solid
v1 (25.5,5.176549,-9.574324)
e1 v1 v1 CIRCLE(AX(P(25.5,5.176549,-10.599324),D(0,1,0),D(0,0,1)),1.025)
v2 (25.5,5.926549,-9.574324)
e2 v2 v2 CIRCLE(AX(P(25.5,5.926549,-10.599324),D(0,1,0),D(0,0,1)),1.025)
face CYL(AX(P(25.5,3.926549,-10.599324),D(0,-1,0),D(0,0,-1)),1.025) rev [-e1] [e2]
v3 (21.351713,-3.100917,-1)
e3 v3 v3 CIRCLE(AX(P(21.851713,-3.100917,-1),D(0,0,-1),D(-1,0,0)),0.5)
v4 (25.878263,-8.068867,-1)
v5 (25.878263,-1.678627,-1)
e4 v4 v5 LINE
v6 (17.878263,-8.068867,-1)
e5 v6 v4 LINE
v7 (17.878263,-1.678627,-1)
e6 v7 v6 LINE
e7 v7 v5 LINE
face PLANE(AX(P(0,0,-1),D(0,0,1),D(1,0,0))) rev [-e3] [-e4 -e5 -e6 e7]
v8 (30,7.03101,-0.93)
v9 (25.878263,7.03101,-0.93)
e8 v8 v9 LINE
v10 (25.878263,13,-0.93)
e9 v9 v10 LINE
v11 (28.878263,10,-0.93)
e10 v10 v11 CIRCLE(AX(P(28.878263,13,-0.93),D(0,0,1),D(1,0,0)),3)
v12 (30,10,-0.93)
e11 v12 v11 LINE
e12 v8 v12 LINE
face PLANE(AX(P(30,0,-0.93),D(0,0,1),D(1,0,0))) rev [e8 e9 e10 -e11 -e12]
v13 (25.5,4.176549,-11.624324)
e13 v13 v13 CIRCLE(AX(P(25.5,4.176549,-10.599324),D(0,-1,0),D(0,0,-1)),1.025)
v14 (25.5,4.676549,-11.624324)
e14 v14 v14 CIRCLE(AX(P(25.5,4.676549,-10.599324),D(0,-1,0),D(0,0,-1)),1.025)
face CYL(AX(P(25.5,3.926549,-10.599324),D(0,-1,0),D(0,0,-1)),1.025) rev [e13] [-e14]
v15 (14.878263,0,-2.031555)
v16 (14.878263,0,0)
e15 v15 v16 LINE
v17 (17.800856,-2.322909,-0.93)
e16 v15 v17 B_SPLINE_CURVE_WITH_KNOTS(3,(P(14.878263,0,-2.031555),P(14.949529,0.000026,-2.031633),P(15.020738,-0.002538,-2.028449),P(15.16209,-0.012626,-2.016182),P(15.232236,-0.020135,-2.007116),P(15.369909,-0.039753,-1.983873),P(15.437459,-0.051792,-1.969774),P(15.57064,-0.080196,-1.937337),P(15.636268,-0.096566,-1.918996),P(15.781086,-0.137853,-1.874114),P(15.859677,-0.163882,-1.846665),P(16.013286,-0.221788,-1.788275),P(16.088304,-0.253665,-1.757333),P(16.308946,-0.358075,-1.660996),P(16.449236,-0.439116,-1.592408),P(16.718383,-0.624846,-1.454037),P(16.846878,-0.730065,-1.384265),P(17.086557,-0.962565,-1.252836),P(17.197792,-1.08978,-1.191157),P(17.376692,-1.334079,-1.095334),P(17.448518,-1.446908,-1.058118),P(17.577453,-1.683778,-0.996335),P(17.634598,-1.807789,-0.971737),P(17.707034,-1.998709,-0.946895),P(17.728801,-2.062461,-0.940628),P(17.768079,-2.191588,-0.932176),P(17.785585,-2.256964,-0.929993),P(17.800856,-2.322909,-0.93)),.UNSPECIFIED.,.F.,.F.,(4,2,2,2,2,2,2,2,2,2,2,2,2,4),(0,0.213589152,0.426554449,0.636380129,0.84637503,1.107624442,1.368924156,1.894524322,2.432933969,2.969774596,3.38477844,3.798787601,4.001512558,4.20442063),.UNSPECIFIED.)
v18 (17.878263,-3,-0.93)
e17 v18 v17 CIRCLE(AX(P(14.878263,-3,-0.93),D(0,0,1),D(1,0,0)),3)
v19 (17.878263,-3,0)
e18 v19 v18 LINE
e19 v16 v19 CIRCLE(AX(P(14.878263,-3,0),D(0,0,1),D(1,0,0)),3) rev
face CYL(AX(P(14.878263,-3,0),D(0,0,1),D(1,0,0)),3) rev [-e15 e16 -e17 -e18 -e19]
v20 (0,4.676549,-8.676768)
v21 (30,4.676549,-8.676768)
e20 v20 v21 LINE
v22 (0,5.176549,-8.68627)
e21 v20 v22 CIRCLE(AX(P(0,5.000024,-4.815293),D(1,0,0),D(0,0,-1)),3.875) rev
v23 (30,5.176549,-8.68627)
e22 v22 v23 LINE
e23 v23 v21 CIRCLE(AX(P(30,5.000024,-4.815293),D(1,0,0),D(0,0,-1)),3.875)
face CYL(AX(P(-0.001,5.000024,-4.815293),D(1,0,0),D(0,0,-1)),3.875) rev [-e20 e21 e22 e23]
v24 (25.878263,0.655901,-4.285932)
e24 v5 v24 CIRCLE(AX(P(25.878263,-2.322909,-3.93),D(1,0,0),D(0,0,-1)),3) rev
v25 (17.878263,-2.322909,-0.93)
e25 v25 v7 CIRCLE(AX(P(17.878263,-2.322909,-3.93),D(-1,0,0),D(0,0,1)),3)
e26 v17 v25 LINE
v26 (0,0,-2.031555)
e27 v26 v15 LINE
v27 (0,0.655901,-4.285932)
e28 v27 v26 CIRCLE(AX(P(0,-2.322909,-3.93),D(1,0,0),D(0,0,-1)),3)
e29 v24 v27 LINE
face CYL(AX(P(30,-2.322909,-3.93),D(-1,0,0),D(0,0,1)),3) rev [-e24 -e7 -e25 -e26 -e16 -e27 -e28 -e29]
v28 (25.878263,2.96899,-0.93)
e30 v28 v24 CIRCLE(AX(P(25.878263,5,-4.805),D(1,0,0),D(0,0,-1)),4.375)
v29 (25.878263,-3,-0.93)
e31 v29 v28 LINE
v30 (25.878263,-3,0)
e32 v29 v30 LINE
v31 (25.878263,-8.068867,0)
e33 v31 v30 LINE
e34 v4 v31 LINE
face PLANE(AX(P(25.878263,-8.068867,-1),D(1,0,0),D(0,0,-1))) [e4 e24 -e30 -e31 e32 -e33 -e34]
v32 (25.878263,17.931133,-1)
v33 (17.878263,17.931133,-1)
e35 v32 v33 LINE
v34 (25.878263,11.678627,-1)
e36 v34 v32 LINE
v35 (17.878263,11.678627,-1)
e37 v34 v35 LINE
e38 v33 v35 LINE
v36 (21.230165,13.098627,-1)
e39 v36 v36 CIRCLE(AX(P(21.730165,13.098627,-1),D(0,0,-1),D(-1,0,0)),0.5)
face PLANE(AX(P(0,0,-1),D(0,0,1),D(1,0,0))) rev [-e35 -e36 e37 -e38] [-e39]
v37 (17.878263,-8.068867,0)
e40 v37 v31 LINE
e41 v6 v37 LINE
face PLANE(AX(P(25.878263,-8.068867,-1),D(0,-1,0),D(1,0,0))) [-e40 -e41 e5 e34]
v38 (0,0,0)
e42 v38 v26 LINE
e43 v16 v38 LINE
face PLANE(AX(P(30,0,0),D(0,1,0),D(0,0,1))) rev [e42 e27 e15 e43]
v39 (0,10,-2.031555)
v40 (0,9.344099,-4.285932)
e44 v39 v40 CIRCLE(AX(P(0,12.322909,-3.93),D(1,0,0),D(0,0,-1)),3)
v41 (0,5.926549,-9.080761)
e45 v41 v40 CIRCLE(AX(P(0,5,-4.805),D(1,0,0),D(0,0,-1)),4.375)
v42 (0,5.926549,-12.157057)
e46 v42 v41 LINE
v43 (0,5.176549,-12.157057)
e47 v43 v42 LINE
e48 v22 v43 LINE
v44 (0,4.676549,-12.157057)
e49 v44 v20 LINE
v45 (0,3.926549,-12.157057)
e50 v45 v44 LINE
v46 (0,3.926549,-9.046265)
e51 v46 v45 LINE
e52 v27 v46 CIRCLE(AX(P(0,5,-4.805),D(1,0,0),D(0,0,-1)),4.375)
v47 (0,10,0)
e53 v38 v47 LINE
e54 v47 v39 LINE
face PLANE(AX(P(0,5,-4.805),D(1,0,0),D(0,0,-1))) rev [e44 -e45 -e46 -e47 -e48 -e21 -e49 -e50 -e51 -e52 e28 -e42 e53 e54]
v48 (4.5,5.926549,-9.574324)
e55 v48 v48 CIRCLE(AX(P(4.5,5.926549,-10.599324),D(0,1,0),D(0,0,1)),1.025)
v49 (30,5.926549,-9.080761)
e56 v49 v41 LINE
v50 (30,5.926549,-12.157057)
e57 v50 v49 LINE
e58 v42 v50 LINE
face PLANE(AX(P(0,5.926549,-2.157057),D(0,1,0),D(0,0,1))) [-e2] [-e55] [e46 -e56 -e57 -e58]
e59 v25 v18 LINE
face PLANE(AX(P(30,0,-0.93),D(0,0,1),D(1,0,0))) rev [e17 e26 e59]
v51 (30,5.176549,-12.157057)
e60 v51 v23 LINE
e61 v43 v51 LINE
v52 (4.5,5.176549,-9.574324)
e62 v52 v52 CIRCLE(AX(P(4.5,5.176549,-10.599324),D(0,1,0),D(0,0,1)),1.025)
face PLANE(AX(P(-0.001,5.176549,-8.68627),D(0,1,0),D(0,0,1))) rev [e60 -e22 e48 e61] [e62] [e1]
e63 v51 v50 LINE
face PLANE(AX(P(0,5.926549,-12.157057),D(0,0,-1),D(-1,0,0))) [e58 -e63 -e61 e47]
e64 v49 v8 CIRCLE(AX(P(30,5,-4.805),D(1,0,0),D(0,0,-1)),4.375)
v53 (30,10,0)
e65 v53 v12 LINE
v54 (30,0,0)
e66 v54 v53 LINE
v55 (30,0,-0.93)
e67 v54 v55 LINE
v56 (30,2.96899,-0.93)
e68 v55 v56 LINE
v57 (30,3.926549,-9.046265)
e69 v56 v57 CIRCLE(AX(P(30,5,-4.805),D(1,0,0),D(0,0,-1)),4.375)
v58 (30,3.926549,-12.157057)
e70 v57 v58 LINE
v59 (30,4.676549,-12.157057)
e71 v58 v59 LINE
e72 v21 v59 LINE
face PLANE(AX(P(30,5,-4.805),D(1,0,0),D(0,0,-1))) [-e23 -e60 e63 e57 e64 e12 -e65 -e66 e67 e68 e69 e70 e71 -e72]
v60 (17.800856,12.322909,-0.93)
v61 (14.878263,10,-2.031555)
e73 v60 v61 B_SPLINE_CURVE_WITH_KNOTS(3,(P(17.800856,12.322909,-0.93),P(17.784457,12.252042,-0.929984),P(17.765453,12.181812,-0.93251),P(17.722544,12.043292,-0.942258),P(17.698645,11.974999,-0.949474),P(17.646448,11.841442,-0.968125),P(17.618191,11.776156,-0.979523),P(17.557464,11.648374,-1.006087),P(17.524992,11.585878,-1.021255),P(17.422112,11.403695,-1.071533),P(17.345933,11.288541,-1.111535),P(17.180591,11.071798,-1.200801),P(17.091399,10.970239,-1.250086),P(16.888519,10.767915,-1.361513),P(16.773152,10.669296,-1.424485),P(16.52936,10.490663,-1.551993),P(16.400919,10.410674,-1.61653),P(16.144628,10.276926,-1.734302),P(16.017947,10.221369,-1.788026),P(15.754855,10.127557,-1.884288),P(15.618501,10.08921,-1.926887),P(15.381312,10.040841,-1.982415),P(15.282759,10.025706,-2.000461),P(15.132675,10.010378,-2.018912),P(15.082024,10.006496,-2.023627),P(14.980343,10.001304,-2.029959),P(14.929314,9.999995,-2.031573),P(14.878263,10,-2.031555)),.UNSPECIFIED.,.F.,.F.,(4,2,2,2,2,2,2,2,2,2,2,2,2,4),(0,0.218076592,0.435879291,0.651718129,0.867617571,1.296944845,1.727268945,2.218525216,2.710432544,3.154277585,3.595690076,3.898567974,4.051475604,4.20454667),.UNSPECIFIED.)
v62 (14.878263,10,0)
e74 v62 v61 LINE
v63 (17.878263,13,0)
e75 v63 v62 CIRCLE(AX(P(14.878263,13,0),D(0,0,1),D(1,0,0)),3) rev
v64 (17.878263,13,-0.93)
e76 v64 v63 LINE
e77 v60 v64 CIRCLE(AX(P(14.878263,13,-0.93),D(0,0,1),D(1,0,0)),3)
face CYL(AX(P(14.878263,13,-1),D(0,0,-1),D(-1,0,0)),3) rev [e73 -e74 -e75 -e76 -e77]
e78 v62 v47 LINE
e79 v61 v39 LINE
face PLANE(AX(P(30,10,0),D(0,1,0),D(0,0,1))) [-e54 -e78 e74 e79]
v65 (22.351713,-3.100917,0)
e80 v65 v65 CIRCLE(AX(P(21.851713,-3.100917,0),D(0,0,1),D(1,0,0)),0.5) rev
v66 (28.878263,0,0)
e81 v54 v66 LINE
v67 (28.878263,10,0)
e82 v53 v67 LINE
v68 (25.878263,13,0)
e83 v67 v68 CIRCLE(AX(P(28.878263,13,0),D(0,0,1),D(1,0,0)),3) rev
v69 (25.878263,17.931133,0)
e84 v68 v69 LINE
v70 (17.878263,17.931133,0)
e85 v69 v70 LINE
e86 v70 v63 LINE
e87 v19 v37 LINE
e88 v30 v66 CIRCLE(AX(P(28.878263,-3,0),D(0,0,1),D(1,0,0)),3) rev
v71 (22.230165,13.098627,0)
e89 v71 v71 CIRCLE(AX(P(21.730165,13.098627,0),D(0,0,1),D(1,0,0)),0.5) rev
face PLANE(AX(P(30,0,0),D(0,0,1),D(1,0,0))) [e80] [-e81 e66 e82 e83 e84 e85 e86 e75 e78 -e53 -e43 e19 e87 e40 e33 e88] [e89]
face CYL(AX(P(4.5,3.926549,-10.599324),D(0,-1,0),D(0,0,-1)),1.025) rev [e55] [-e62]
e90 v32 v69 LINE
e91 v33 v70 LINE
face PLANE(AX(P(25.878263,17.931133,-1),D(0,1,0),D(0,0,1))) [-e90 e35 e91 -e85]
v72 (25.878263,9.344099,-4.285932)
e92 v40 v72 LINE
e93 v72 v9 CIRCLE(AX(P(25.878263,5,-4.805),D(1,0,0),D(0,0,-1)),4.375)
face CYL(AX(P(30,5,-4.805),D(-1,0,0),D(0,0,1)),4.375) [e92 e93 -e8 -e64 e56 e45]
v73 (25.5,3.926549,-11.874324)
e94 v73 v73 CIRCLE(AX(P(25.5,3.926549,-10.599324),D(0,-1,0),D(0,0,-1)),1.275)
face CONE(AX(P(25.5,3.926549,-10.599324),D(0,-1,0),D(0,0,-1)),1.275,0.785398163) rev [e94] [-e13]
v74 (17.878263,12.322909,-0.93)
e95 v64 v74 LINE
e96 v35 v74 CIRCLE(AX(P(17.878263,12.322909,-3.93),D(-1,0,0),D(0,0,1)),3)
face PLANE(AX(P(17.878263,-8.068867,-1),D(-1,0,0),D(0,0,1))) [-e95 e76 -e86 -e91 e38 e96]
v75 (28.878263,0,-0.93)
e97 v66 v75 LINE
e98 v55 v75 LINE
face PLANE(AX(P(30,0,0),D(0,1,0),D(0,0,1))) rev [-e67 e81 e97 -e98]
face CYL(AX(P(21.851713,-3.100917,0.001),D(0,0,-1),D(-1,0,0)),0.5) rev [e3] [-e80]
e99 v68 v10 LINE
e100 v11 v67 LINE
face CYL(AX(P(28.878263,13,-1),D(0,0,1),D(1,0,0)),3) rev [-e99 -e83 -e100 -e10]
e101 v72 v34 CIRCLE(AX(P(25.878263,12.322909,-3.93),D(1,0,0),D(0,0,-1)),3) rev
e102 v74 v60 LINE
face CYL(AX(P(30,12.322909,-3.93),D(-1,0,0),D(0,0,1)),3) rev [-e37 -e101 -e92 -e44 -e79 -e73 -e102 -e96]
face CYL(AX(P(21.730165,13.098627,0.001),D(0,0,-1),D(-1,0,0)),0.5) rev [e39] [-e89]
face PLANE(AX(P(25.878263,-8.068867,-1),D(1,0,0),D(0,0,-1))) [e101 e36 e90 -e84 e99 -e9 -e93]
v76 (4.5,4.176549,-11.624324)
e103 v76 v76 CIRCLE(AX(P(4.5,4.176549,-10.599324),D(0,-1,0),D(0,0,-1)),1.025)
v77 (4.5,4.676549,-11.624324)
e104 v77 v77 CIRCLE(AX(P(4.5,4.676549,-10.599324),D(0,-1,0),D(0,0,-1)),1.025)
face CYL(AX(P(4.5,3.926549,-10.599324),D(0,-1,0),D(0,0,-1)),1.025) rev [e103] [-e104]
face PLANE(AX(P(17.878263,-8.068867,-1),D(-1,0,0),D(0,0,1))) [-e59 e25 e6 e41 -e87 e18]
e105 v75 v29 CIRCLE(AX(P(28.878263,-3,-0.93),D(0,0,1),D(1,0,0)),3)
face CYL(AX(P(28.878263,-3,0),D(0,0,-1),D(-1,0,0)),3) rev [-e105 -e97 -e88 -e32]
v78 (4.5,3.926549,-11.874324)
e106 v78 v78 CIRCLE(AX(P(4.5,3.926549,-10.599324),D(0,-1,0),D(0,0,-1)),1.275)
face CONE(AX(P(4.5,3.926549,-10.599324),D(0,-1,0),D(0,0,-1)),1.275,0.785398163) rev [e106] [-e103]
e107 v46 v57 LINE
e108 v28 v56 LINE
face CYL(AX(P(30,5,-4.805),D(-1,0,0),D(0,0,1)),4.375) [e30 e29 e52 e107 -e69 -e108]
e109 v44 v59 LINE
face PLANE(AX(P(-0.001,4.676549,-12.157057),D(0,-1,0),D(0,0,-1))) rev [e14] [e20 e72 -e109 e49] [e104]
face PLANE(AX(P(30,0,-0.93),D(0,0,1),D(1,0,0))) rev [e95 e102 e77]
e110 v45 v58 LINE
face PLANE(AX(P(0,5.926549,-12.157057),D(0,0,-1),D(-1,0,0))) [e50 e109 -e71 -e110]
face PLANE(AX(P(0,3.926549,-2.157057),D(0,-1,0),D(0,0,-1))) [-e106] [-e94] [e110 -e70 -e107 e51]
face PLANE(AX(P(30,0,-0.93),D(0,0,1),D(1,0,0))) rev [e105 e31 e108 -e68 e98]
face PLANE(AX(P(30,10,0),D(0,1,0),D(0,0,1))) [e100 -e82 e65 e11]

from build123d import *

# Parameters (mm, degrees)
SKETCH1_R                          = 4.375
SKETCH1_W                          = 0.93
SKETCH1_H                          = 10
BOSS_EXTRUDE1_DEPTH                = 30
SKETCH2_W                          = 8
SKETCH2_H                          = 26
BOSS_EXTRUDE3_DEPTH                = 1
FILLET4_R                          = 3
FILLET5_DEPTH                      = 25.878263471
FILLET5_START                      = 14.878263371
FILLET5_2_DEPTH                    = 11.0000001
FILLET5_START_2                    = -3
FILLET5_3_DEPTH                    = 2.07
CUT_EXTRUDE1_REACH                 = 37.895
SKETCH3_R                          = 0.5
SKETCH4_W                          = 10
SKETCH4_H                          = 2
BOSS_EXTRUDE4_DEPTH                = 30
CUT_EXTRUDE2_REACH                 = 39.004
SKETCH5_R                          = 3.875
CUT_EXTRUDE4_REACH                 = 39.004
M2_5X0_45_TAPPED_HOLE1_D           = 2.05
M2_5X0_45_TAPPED_HOLE1_CSINK_D     = 2.55
M2_5X0_45_TAPPED_HOLE1_CSINK_ANGLE = 90


with BuildPart() as part:
    # Sketch1 → Boss-Extrude1 (new body)
    with BuildSketch(Plane(origin=(0, 0, 0), x_dir=(0, 0, -1), z_dir=(1, 0, 0))):
        with Locations((4.805, 5)):
            Circle(SKETCH1_R)
        with Locations((0.465, 5)):
            Rectangle(SKETCH1_W, SKETCH1_H)
    extrude(amount=BOSS_EXTRUDE1_DEPTH)

    # Sketch2 → Boss-Extrude3 (add)
    with BuildSketch(Plane.XY):
        with Locations((21.878263471, 4.931133475)):
            Rectangle(SKETCH2_W, SKETCH2_H)
    extrude(amount=-BOSS_EXTRUDE3_DEPTH)

    # Fillet4
    fillet4_edges = [part.edges().sort_by_distance(p)[0] for p in [
        (17.878263471, 10, -0.465),
        (25.878263471, 10, -0.465),
        (17.878263471, 0, -0.465),
        (25.878263471, 0, -0.465),
    ]]
    fillet(fillet4_edges, radius=FILLET4_R)

    # Fillet5: read off the stored shape, not the designer's step
    # Fillet5 outline → Fillet5 (add)
    with BuildSketch(Plane.YZ):
        with BuildLine():
            ThreePointArc((9.344098712, -4.285932203), (9.442351653, -3.091914153), (10, -2.031555221))
            Line((10, -2.031555221), (10, -0.93))
            Line((10, -0.93), (7.031009601, -0.93))
            ThreePointArc((7.031009601, -0.93), (8.602231494, -2.32214816), (9.344098712, -4.285932203))
        make_face()
        with BuildLine():
            ThreePointArc((0, -2.031555221), (0.557648347, -3.091914153), (0.655901288, -4.285932203))
            ThreePointArc((0.655901288, -4.285932203), (1.397768506, -2.32214816), (2.968990399, -0.93))
            Line((2.968990399, -0.93), (0, -0.93))
            Line((0, -0.93), (0, -2.031555221))
        make_face()
    extrude(amount=FILLET5_DEPTH)

    # Fillet5 2 outline → Fillet5 2 (add)
    with BuildSketch(Plane.YZ.offset(FILLET5_START)):
        with BuildLine():
            ThreePointArc((10, -2.031555221), (11.037478267, -1.219341931), (12.322909258, -0.93))
            Line((12.322909258, -0.93), (10, -0.93))
            Line((10, -0.93), (10, -2.031555221))
        make_face()
        with BuildLine():
            Line((0, -2.031555221), (0, -0.93))
            Line((0, -0.93), (-2.322909258, -0.93))
            ThreePointArc((-2.322909258, -0.93), (-1.037478267, -1.219341931), (0, -2.031555221))
        make_face()
    extrude(amount=FILLET5_2_DEPTH)

    # Fillet5 3 outline → Fillet5 3 (cut)
    with BuildSketch(Plane.XY.offset(FILLET5_START_2)):
        with BuildLine():
            ThreePointArc((14.878263471, 10), (16.999583814, 10.878679656), (17.878263471, 13))
            Line((17.878263471, 13), (17.878263471, 14))
            Line((17.878263471, 14), (14.878263371, 14))
            Line((14.878263371, 14), (14.878263471, 10))
        make_face()
        with BuildLine():
            Line((14.878263371, -4), (17.878263471, -4))
            Line((17.878263471, -4), (17.878263471, -3))
            ThreePointArc((17.878263471, -3), (16.999583814, -0.878679657), (14.878263471, 0))
            Line((14.878263471, 0), (14.878263371, -4))
        make_face()
    extrude(amount=FILLET5_3_DEPTH, mode=Mode.SUBTRACT)

    # Sketch3 → Cut-Extrude1 (cut, up to next)
    with BuildSketch(Plane(origin=(0, 0, -1), x_dir=(-1, 0, 0), z_dir=(0, 0, -1)), mode=Mode.PRIVATE) as cut_extrude1_sk1:
        with Locations((-21.730165356, 13.098626711)):
            Circle(SKETCH3_R)
    cut_extrude1_tool1 = extrude(cut_extrude1_sk1.sketch, amount=-CUT_EXTRUDE1_REACH, mode=Mode.PRIVATE) & part.part
    # Sketch3 → Cut-Extrude1 (cut, up to next)
    with BuildSketch(Plane(origin=(0, 0, -1), x_dir=(-1, 0, 0), z_dir=(0, 0, -1)), mode=Mode.PRIVATE) as cut_extrude1_sk2:
        with Locations((-21.851713242, -3.100917298)):
            Circle(SKETCH3_R)
    cut_extrude1_tool2 = extrude(cut_extrude1_sk2.sketch, amount=-CUT_EXTRUDE1_REACH, mode=Mode.PRIVATE) & part.part
    add(cut_extrude1_tool1.solids().sort_by_distance((21.730165, 13.098627, -1))[0], mode=Mode.SUBTRACT)
    add(cut_extrude1_tool2.solids().sort_by_distance((21.851713, -3.100917, -1))[0], mode=Mode.SUBTRACT)

    # Sketch4 → Boss-Extrude4 (add)
    with BuildSketch(Plane(origin=(30, 0, 0), x_dir=(0, 0, -1), z_dir=(1, 0, 0))):
        with Locations((7.157056942, 4.926549366)):
            Rectangle(SKETCH4_W, SKETCH4_H)
    extrude(amount=-BOSS_EXTRUDE4_DEPTH)

    # Sketch5 → Cut-Extrude2 (cut, up to next)
    with BuildSketch(Plane(origin=(30, 0, 0), x_dir=(0, 0, -1), z_dir=(1, 0, 0)), mode=Mode.PRIVATE) as cut_extrude2_sk1:
        with Locations((4.815292967, 5.000024119)):
            Circle(SKETCH5_R)
    cut_extrude2_tool1 = extrude(cut_extrude2_sk1.sketch, amount=-CUT_EXTRUDE2_REACH, mode=Mode.PRIVATE) & part.part
    add(cut_extrude2_tool1.solids().sort_by_distance((30, 5.000024, -4.815293))[0], mode=Mode.SUBTRACT)

    # Sketch6 → Cut-Extrude4 (cut, up to next)
    with BuildSketch(Plane(origin=(30, 0, 0), x_dir=(0, 0, -1), z_dir=(1, 0, 0)), mode=Mode.PRIVATE) as cut_extrude4_sk1:
        with BuildLine():
            Line((12.157056942, 5.176549366), (12.157056942, 4.676549366))
            Line((12.157056942, 4.676549366), (8.676767955, 4.676549366))
            add(Edge.make_bspline(
                [(8.676767955, 4.676549366), (8.69766925, 4.926395918), (8.686270084, 5.176549366)],
                knots=[0, 0, 0, 1, 1, 1], degree=2))
            Line((8.686270084, 5.176549366), (12.157056942, 5.176549366))
        make_face()
    cut_extrude4_tool1 = extrude(cut_extrude4_sk1.sketch, amount=-CUT_EXTRUDE4_REACH, mode=Mode.PRIVATE) & part.part
    add(cut_extrude4_tool1.solids().sort_by_distance((30, 4.926435, -10.421978))[0], mode=Mode.SUBTRACT)

    # M2.5x0.45 Tapped Hole1 (through all)
    with Locations(Plane(origin=(0, 3.926549366, 0), x_dir=(-1, 0, 0), z_dir=(0, -1, 0))):
        with Locations((-25.5, 10.599323574), (-4.5, 10.599323574)):
            CounterSinkHole(M2_5X0_45_TAPPED_HOLE1_D / 2, M2_5X0_45_TAPPED_HOLE1_CSINK_D / 2, counter_sink_angle=M2_5X0_45_TAPPED_HOLE1_CSINK_ANGLE)


solid = part.part
